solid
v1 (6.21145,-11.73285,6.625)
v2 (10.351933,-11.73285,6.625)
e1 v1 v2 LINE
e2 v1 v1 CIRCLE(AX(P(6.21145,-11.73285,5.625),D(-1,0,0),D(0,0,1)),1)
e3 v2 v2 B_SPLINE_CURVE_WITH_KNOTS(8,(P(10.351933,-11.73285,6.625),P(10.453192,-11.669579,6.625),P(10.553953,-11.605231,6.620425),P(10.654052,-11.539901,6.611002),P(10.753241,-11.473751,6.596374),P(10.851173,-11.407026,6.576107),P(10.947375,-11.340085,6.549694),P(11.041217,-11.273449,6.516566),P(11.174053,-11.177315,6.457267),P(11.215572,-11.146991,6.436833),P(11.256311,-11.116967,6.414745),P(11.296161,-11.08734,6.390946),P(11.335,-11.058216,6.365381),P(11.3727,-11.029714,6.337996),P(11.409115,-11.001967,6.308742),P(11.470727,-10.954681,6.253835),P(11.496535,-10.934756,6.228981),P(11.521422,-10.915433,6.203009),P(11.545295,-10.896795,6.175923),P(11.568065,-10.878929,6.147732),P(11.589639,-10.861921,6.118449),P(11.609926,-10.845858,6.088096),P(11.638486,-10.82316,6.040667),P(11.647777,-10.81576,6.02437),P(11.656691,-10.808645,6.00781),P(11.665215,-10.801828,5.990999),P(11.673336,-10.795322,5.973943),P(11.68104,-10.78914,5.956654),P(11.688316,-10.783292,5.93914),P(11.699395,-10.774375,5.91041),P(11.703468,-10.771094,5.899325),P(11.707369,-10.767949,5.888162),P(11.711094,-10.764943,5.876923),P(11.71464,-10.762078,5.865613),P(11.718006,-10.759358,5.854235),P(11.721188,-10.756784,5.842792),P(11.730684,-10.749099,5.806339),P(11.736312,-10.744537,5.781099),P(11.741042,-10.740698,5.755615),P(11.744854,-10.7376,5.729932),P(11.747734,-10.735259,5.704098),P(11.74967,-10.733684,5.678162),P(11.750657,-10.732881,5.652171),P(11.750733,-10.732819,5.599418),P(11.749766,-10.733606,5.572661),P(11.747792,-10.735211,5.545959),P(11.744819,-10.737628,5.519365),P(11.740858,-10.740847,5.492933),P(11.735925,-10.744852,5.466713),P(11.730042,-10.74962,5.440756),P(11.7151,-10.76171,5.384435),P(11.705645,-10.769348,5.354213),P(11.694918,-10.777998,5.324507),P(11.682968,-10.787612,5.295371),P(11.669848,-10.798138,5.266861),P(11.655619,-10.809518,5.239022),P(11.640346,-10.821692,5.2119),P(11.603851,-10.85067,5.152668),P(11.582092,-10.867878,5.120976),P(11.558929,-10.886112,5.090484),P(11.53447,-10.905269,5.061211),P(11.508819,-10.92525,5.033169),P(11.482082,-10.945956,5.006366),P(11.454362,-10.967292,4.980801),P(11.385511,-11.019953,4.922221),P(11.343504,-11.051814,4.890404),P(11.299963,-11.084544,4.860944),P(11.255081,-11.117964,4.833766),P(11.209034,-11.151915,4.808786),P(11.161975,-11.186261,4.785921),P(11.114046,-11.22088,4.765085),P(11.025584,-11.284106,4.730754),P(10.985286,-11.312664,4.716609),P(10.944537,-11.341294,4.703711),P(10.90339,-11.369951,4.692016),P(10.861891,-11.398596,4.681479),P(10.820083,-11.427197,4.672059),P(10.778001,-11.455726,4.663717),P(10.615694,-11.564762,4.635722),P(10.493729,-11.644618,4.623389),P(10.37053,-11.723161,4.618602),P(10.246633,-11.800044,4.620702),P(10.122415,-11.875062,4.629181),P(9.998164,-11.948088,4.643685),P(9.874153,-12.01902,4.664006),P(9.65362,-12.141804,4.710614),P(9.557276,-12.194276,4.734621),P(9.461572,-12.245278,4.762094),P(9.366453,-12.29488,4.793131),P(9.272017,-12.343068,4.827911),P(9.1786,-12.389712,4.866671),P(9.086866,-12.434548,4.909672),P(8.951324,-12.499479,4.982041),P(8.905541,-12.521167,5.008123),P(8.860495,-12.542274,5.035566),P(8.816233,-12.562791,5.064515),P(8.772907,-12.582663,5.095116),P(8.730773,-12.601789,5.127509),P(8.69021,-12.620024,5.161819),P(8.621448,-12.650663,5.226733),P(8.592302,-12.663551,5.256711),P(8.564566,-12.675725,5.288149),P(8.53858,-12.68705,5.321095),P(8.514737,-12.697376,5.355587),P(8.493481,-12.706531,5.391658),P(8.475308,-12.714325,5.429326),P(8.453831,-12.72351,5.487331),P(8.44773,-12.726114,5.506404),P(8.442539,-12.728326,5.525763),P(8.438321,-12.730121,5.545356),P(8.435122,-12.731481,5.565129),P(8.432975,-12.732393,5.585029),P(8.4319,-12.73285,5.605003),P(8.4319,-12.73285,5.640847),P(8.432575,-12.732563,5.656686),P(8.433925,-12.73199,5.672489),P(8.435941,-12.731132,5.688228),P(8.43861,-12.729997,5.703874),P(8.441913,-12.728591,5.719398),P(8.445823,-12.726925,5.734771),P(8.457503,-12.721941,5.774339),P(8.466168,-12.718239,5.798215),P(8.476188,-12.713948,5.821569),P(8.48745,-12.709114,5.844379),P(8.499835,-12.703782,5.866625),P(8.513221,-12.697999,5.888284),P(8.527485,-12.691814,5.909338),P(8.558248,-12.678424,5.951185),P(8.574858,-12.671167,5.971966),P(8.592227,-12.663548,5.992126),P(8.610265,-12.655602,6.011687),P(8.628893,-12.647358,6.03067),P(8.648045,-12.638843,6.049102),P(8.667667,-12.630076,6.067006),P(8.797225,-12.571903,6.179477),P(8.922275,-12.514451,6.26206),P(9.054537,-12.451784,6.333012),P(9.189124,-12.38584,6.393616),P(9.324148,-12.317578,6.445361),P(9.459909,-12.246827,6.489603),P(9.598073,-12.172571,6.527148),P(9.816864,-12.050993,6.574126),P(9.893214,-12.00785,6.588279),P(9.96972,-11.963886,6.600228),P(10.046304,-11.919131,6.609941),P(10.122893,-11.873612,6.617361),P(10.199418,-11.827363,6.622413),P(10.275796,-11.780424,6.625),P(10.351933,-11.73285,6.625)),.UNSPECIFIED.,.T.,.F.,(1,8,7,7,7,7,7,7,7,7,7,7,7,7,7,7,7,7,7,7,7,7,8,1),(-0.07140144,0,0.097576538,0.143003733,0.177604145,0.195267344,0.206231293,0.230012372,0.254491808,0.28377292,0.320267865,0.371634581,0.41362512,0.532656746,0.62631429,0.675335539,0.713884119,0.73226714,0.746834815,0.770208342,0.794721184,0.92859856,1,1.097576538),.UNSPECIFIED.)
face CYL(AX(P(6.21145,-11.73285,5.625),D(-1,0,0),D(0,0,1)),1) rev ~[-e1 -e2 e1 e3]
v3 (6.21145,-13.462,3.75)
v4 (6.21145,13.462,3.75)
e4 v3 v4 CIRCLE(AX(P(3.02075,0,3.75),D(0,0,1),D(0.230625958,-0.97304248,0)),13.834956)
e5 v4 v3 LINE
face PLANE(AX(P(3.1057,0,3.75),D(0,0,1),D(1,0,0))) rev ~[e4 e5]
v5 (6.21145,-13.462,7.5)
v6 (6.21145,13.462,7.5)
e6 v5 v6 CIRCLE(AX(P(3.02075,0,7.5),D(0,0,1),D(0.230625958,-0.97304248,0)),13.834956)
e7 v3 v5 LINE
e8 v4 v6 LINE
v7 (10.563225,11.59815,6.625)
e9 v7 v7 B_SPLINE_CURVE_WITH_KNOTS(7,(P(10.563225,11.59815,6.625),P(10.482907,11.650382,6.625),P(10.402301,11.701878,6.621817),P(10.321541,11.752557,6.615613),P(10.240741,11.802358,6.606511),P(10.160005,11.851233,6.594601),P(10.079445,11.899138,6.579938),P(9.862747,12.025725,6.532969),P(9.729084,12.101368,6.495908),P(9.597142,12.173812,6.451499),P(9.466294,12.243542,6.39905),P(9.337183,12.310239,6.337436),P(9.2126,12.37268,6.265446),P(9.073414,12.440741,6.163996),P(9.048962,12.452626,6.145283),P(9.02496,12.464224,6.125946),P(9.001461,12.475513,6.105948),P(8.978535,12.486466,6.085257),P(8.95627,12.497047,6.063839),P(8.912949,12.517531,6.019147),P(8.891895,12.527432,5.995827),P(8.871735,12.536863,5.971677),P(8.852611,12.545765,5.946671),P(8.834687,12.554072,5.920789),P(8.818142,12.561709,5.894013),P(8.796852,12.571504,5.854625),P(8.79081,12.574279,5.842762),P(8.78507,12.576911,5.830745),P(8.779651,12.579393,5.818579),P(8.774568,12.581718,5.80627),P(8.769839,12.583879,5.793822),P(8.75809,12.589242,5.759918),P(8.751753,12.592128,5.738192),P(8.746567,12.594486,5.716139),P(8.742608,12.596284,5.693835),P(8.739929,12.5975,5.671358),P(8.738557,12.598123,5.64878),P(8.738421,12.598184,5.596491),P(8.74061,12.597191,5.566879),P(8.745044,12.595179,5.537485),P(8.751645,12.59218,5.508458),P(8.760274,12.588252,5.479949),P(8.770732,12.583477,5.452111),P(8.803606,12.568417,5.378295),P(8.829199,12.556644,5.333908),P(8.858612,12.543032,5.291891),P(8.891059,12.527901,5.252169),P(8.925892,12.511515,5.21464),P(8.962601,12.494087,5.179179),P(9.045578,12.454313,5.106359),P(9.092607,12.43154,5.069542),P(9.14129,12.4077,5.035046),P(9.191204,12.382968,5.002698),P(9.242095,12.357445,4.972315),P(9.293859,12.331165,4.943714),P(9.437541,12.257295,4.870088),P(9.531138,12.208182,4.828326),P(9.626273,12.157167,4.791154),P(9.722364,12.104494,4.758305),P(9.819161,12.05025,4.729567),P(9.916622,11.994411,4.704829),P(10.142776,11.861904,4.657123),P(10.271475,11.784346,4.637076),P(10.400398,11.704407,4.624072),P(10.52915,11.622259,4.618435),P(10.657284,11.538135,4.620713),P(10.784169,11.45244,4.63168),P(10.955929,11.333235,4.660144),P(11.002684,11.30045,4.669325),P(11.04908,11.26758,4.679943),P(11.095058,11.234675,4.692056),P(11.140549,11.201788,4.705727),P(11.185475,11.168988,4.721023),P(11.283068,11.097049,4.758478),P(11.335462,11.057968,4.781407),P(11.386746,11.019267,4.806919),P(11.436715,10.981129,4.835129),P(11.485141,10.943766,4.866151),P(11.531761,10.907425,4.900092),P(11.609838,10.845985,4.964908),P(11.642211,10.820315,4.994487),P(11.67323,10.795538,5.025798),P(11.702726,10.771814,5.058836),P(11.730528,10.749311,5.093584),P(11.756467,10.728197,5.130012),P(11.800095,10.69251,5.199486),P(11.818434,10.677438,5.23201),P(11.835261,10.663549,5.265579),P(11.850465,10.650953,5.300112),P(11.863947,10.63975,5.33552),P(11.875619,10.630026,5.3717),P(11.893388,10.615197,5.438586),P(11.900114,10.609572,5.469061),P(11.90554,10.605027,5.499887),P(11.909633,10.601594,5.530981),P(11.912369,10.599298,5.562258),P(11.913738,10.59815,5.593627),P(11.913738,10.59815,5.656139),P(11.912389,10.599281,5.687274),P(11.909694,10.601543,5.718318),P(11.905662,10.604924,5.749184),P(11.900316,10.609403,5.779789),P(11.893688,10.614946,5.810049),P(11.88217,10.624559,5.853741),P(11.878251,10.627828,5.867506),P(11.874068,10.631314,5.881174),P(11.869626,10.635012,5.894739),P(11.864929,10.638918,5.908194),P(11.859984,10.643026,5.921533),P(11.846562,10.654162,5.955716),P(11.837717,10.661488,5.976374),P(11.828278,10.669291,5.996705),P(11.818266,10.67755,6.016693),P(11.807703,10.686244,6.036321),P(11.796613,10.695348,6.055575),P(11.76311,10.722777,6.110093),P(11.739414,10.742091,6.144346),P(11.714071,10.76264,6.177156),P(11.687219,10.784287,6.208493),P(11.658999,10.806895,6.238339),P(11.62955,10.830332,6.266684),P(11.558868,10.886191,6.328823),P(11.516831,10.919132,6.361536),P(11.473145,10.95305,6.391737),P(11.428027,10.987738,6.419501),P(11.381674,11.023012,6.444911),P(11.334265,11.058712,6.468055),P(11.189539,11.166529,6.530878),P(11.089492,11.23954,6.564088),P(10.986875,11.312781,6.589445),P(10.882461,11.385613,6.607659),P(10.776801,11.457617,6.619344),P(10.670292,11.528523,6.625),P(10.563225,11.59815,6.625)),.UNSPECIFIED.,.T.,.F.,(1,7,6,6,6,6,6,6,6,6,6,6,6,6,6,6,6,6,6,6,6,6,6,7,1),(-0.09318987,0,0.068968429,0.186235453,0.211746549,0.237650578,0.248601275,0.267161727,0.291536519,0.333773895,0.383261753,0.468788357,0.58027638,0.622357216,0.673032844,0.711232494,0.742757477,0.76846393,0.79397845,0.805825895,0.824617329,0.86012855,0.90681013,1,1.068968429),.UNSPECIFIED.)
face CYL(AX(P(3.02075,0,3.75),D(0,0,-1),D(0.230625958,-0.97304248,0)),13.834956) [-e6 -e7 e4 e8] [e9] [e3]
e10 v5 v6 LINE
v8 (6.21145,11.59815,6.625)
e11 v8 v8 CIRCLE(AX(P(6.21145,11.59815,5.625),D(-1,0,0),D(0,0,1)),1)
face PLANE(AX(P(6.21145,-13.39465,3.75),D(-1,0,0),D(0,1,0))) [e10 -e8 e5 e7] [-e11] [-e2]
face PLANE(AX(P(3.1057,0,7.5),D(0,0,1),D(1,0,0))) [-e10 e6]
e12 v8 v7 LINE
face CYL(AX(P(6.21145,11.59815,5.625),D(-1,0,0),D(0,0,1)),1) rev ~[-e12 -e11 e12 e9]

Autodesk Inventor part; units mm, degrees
ref_plane "YZ Plane" through (0, 0, 0) normal (1, 0, 0) x (0, 1, 0)
ref_plane "XZ Plane" through (0, 0, 0) normal (0, 1, 0) x (-1, 0, 0)
ref_plane "XY Plane" through (0, 0, 0) normal (0, 0, 1) x (1, 0, 0)
sketch "Sketch1" plane through (0, 0, 0) normal (0, 0, 1) x (1, 0, 0)
  line L0 (6.2115, -26.7893) -> (6.2115, 26.924)
  line L1 (6.2115, 26.7893) -> (6.2115, -26.7893)
  arc A0 (6.2115, -26.924) -> (6.2115, 26.924) centre (-0.1699, 0) ccw
  line L2 (6.2115, 26.924) -> (6.2115, -26.924)
  point P0 (0, 0)
  point P1 (-5.2115, 24.6247)
extrude "Extrusion1" add sketch "Sketch1" along normal blind 7.5
sketch "Sketch2" plane through (6.2115, -26.924, 0) normal (-1, 0, 0) x (0, 0, 1)
  line L0 (0, 6.9167) -> (7.5, 6.9167)
  line L1 (0, 0) -> (0, 6.9167)
  line L2 (0, 6.9167) -> (7.5, 6.9167)
  line L3 (7.5, 26.7893) -> (7.5, 0)
  line L4 (7.5, 6.9167) -> (7.5, 0)
  line L5 (7.5, 0) -> (0, 0)
  line L6 (7.5, 0) -> (0, 0)
  circle A0 centre (3.75, 3.4583) radius 1
  line L7 (0, 0) -> (0, 53.5786)
  line L8 (0, 53.5786) -> (0, 0)
  line L9 (0, 26.7893) -> (7.5, 26.7893)
  circle A1 centre (3.75, 50.1203) radius 1
  circle A2 centre (3.75, 3.4583) radius 2
  circle A3 centre (3.75, 50.1203) radius 2
  point P0 (0, 26.924)
  point P1 (280.32, 51.414)
  point P2 (4.4851, 4.1363)
  point P3 (4.4851, 2.7804)
  point P4 (3.0149, 4.1363)
  point P5 (3.0149, 2.7804)
  dimension "d2" = 2
  dimension "d5" = 4
  dimension "d6" = 4
extrude "Extrusion2" cut sketch "Sketch2" against normal blind 25.4 contours A0 | A1
extrude "Extrusion3" cut sketch "Sketch2" against normal blind 16.35 contours A2 | A3
scale "Scale1" factors (0.5, 0.5, 0.5) then translate (3.1057, 0, 3.75) bodies 1
properties part number "Contrapeso4"
